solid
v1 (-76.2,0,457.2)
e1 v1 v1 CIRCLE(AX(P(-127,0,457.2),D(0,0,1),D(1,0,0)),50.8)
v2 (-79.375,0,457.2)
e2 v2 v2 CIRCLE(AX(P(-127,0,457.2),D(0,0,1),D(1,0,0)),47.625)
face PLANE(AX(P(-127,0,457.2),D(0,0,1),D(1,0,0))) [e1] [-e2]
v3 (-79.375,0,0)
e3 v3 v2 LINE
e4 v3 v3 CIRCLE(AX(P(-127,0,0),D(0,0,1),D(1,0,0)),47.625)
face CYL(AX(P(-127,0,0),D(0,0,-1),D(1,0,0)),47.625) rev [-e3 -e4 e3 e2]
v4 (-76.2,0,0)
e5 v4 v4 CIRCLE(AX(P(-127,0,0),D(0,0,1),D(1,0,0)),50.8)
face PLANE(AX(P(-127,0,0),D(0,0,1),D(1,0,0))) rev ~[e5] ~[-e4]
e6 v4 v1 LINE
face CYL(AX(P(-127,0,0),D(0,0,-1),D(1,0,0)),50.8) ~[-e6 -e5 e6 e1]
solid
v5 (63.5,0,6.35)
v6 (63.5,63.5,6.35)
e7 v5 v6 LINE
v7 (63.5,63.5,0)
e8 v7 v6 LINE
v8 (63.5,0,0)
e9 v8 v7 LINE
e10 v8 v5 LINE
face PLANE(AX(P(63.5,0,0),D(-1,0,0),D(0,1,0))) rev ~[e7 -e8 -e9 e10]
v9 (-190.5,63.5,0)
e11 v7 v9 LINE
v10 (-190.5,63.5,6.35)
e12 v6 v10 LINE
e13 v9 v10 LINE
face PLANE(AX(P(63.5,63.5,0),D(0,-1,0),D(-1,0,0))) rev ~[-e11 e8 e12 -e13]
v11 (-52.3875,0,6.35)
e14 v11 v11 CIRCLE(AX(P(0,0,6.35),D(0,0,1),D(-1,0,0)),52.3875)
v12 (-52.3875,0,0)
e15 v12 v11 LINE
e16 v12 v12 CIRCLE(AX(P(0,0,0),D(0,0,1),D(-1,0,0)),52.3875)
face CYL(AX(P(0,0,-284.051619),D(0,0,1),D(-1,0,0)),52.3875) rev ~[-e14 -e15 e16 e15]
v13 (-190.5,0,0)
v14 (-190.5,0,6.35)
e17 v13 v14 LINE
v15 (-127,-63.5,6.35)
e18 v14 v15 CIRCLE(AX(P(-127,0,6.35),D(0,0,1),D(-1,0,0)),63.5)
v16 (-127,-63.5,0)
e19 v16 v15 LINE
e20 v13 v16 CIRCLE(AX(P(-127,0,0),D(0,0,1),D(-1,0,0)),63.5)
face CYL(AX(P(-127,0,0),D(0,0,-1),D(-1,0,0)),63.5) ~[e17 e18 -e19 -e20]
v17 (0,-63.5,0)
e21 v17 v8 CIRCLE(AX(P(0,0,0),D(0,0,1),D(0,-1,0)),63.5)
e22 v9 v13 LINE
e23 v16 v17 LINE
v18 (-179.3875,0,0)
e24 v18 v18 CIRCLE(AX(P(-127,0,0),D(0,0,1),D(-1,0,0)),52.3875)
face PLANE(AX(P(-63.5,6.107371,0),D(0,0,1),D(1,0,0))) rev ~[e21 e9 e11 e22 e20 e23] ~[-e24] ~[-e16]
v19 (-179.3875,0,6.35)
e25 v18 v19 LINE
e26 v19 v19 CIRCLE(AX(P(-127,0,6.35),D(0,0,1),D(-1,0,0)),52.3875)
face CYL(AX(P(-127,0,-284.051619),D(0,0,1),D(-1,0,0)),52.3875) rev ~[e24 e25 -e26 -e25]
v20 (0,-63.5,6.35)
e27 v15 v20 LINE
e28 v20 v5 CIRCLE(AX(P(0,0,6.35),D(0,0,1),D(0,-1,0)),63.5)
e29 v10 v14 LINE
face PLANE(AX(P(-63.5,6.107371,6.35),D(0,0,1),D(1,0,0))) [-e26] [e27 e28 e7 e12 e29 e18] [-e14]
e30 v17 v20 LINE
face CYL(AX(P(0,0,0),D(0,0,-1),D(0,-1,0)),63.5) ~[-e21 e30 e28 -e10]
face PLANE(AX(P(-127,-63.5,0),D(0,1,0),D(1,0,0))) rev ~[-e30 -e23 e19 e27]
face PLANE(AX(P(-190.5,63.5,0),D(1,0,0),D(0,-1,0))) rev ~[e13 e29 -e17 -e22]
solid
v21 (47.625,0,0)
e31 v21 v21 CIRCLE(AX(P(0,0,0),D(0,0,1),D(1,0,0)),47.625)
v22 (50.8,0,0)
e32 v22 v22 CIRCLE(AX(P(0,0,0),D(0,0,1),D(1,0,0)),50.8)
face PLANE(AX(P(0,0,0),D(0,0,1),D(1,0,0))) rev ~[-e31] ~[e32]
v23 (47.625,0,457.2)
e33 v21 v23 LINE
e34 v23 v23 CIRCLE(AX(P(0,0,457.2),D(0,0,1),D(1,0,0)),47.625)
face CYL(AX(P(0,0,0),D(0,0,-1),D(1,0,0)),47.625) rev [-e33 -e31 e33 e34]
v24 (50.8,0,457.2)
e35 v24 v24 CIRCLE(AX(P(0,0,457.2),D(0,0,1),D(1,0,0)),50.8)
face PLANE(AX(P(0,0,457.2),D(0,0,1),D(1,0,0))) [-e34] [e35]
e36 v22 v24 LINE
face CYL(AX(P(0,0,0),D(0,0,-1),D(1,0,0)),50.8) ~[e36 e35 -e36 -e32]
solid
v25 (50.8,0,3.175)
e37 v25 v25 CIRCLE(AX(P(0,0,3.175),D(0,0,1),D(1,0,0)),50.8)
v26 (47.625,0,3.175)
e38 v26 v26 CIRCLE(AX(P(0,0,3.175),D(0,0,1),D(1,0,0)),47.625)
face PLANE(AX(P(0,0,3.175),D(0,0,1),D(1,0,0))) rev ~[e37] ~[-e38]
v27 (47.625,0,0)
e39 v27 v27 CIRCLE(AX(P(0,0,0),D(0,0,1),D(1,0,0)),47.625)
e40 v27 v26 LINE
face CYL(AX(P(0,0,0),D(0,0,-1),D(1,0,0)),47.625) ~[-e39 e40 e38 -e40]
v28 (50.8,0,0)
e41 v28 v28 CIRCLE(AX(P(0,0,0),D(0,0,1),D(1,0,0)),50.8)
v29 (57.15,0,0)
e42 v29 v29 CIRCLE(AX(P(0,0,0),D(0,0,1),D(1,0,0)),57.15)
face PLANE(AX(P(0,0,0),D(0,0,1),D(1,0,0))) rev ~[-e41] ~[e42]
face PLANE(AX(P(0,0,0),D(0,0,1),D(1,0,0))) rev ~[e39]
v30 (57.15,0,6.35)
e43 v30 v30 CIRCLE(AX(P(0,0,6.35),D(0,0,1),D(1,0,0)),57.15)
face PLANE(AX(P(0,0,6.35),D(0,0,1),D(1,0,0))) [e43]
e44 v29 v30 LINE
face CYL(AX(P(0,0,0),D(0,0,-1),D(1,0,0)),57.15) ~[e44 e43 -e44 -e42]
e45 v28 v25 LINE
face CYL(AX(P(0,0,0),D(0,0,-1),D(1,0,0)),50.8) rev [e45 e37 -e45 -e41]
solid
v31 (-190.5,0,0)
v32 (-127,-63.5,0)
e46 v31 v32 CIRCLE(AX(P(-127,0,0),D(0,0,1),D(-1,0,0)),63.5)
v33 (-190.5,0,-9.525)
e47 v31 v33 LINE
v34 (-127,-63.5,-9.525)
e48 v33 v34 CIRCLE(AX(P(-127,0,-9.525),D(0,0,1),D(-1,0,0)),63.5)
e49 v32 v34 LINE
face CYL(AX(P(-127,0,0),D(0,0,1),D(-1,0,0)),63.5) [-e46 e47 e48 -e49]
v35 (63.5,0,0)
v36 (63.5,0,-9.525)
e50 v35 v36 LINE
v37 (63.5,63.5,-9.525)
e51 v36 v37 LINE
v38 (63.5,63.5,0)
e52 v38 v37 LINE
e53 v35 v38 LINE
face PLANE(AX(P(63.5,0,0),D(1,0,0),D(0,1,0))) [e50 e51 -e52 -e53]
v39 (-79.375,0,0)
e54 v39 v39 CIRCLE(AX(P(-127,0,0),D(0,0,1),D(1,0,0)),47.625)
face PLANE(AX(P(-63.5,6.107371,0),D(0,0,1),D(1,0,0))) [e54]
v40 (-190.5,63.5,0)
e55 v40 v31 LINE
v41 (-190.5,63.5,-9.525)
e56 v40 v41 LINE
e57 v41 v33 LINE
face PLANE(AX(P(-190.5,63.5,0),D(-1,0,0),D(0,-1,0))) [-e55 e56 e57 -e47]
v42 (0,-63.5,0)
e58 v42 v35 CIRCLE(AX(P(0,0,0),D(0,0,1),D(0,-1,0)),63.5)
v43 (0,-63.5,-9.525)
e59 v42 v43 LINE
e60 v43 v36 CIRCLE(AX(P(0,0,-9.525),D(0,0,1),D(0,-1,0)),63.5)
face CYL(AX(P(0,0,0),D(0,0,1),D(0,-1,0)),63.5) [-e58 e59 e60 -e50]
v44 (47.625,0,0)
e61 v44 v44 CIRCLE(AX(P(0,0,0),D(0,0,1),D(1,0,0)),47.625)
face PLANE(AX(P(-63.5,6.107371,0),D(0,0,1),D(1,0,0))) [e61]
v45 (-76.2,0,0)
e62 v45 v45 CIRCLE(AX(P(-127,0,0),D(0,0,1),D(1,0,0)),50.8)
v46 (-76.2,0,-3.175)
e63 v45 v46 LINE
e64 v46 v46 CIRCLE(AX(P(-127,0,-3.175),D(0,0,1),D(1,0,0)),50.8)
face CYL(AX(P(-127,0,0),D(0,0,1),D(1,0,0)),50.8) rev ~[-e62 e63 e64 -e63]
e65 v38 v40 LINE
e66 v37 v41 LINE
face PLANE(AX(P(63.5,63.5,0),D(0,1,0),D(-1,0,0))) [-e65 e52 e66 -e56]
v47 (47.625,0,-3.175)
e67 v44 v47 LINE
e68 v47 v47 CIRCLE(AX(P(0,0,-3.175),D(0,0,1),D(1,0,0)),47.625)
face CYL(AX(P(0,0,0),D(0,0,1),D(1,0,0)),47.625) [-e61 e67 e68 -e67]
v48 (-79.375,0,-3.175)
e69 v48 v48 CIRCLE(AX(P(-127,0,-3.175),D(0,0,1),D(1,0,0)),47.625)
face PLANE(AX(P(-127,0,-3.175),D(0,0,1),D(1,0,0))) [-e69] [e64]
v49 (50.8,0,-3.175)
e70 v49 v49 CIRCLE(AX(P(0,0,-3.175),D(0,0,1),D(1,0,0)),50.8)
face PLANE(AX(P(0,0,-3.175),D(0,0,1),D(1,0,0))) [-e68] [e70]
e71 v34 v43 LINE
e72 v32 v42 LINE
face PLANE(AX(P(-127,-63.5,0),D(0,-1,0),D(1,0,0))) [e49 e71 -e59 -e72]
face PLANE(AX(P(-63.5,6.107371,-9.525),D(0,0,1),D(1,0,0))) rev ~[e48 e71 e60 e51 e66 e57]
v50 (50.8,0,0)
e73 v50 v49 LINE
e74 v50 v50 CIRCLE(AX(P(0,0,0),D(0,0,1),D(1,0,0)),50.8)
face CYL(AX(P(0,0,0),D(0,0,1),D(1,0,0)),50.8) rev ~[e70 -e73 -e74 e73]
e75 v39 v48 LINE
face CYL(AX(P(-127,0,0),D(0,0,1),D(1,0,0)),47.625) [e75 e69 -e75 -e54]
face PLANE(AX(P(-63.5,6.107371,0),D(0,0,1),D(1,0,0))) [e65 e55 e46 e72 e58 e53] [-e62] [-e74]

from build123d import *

# Parameters (mm, degrees)
F0_R     = 57.15
F1_DEPTH = 6.35
F2_DEPTH = 25.4
F4_DEPTH = 9.525
F5_R     = 50.8
F5_R_2   = 47.625
F6_DEPTH = 457.2
F7_DEPTH = 3.175
F8_DEPTH = 3.175
F9_DEPTH = 6.35
F10_D    = 104.775


# Not quite as in the source:
# - a feature names something its author has since deleted; it is built from what else it names


with BuildPart() as f1:
    # F0 (on Top) → F1 (new body)
    with BuildSketch(Plane.XY):
        Circle(F0_R)
    extrude(amount=F1_DEPTH)

    # F2 (cut): a face of the model
    f2_faces = [f1.faces().sort_by_distance(p)[0] for p in [
        (0, 0, 6.35),
    ]]
    extrude(f2_faces, amount=F2_DEPTH, mode=Mode.SUBTRACT)

    # F5 (on Top) → F7 (cut)
    with BuildSketch(Plane.XY):
        Circle(F5_R)
        Circle(F5_R_2, mode=Mode.SUBTRACT)
        with Locations((-127, 0)):
            Circle(F5_R)
        with Locations((-127, 0)):
            Circle(F5_R_2, mode=Mode.SUBTRACT)
    extrude(amount=F7_DEPTH, mode=Mode.SUBTRACT)


with BuildPart() as f4:
    # F3 (on Top) → F4 (new body)
    with BuildSketch(Plane.XY):
        with BuildLine():
            Line((-190.5, 63.5), (-190.5, 0))
            ThreePointArc((-190.5, 0), (-171.9012806053, -44.9012806053), (-127, -63.5))
            Line((-127, -63.5), (0, -63.5))
            ThreePointArc((0, -63.5), (44.9012806053, -44.9012806053), (63.5, 0))
            Line((63.5, 0), (63.5, 63.5))
            Line((63.5, 63.5), (-190.5, 63.5))
        make_face()
    extrude(amount=-F4_DEPTH)

    # F5 (on Top) → F8 (cut)
    with BuildSketch(Plane.XY):
        Circle(F5_R)
        Circle(F5_R_2, mode=Mode.SUBTRACT)
        with Locations((-127, 0)):
            Circle(F5_R)
        with Locations((-127, 0)):
            Circle(F5_R_2, mode=Mode.SUBTRACT)
    extrude(amount=-F8_DEPTH, mode=Mode.SUBTRACT)


with BuildPart() as f6:
    # F5 (on Top) → F6 (new body)
    with BuildSketch(Plane.XY):
        Circle(F5_R)
        Circle(F5_R_2, mode=Mode.SUBTRACT)
    extrude(amount=F6_DEPTH)


with BuildPart() as f6b:
    # F5 (on Top) → F6, piece 2 (new body)
    with BuildSketch(Plane.XY):
        with Locations((-127, 0)):
            Circle(F5_R)
        with Locations((-127, 0)):
            Circle(F5_R_2, mode=Mode.SUBTRACT)
    extrude(amount=F6_DEPTH)


with BuildPart() as f9:
    # F3 (on Top) → F9 (new body)
    with BuildSketch(Plane.XY):
        with BuildLine():
            Line((-190.5, 63.5), (-190.5, 0))
            ThreePointArc((-190.5, 0), (-171.9012806053, -44.9012806053), (-127, -63.5))
            Line((-127, -63.5), (0, -63.5))
            ThreePointArc((0, -63.5), (44.9012806053, -44.9012806053), (63.5, 0))
            Line((63.5, 0), (63.5, 63.5))
            Line((63.5, 63.5), (-190.5, 63.5))
        make_face()
    extrude(amount=F9_DEPTH)

    # F10 (through all)
    with Locations(Plane(origin=(0, 0, 0), x_dir=(1, 0, 0), z_dir=(0, 0, -1))):
        with Locations((-127, 0), (0, 0)):
            Hole(F10_D / 2)


solid = Compound([f1.part, f4.part, f6.part, f6b.part, f9.part])
